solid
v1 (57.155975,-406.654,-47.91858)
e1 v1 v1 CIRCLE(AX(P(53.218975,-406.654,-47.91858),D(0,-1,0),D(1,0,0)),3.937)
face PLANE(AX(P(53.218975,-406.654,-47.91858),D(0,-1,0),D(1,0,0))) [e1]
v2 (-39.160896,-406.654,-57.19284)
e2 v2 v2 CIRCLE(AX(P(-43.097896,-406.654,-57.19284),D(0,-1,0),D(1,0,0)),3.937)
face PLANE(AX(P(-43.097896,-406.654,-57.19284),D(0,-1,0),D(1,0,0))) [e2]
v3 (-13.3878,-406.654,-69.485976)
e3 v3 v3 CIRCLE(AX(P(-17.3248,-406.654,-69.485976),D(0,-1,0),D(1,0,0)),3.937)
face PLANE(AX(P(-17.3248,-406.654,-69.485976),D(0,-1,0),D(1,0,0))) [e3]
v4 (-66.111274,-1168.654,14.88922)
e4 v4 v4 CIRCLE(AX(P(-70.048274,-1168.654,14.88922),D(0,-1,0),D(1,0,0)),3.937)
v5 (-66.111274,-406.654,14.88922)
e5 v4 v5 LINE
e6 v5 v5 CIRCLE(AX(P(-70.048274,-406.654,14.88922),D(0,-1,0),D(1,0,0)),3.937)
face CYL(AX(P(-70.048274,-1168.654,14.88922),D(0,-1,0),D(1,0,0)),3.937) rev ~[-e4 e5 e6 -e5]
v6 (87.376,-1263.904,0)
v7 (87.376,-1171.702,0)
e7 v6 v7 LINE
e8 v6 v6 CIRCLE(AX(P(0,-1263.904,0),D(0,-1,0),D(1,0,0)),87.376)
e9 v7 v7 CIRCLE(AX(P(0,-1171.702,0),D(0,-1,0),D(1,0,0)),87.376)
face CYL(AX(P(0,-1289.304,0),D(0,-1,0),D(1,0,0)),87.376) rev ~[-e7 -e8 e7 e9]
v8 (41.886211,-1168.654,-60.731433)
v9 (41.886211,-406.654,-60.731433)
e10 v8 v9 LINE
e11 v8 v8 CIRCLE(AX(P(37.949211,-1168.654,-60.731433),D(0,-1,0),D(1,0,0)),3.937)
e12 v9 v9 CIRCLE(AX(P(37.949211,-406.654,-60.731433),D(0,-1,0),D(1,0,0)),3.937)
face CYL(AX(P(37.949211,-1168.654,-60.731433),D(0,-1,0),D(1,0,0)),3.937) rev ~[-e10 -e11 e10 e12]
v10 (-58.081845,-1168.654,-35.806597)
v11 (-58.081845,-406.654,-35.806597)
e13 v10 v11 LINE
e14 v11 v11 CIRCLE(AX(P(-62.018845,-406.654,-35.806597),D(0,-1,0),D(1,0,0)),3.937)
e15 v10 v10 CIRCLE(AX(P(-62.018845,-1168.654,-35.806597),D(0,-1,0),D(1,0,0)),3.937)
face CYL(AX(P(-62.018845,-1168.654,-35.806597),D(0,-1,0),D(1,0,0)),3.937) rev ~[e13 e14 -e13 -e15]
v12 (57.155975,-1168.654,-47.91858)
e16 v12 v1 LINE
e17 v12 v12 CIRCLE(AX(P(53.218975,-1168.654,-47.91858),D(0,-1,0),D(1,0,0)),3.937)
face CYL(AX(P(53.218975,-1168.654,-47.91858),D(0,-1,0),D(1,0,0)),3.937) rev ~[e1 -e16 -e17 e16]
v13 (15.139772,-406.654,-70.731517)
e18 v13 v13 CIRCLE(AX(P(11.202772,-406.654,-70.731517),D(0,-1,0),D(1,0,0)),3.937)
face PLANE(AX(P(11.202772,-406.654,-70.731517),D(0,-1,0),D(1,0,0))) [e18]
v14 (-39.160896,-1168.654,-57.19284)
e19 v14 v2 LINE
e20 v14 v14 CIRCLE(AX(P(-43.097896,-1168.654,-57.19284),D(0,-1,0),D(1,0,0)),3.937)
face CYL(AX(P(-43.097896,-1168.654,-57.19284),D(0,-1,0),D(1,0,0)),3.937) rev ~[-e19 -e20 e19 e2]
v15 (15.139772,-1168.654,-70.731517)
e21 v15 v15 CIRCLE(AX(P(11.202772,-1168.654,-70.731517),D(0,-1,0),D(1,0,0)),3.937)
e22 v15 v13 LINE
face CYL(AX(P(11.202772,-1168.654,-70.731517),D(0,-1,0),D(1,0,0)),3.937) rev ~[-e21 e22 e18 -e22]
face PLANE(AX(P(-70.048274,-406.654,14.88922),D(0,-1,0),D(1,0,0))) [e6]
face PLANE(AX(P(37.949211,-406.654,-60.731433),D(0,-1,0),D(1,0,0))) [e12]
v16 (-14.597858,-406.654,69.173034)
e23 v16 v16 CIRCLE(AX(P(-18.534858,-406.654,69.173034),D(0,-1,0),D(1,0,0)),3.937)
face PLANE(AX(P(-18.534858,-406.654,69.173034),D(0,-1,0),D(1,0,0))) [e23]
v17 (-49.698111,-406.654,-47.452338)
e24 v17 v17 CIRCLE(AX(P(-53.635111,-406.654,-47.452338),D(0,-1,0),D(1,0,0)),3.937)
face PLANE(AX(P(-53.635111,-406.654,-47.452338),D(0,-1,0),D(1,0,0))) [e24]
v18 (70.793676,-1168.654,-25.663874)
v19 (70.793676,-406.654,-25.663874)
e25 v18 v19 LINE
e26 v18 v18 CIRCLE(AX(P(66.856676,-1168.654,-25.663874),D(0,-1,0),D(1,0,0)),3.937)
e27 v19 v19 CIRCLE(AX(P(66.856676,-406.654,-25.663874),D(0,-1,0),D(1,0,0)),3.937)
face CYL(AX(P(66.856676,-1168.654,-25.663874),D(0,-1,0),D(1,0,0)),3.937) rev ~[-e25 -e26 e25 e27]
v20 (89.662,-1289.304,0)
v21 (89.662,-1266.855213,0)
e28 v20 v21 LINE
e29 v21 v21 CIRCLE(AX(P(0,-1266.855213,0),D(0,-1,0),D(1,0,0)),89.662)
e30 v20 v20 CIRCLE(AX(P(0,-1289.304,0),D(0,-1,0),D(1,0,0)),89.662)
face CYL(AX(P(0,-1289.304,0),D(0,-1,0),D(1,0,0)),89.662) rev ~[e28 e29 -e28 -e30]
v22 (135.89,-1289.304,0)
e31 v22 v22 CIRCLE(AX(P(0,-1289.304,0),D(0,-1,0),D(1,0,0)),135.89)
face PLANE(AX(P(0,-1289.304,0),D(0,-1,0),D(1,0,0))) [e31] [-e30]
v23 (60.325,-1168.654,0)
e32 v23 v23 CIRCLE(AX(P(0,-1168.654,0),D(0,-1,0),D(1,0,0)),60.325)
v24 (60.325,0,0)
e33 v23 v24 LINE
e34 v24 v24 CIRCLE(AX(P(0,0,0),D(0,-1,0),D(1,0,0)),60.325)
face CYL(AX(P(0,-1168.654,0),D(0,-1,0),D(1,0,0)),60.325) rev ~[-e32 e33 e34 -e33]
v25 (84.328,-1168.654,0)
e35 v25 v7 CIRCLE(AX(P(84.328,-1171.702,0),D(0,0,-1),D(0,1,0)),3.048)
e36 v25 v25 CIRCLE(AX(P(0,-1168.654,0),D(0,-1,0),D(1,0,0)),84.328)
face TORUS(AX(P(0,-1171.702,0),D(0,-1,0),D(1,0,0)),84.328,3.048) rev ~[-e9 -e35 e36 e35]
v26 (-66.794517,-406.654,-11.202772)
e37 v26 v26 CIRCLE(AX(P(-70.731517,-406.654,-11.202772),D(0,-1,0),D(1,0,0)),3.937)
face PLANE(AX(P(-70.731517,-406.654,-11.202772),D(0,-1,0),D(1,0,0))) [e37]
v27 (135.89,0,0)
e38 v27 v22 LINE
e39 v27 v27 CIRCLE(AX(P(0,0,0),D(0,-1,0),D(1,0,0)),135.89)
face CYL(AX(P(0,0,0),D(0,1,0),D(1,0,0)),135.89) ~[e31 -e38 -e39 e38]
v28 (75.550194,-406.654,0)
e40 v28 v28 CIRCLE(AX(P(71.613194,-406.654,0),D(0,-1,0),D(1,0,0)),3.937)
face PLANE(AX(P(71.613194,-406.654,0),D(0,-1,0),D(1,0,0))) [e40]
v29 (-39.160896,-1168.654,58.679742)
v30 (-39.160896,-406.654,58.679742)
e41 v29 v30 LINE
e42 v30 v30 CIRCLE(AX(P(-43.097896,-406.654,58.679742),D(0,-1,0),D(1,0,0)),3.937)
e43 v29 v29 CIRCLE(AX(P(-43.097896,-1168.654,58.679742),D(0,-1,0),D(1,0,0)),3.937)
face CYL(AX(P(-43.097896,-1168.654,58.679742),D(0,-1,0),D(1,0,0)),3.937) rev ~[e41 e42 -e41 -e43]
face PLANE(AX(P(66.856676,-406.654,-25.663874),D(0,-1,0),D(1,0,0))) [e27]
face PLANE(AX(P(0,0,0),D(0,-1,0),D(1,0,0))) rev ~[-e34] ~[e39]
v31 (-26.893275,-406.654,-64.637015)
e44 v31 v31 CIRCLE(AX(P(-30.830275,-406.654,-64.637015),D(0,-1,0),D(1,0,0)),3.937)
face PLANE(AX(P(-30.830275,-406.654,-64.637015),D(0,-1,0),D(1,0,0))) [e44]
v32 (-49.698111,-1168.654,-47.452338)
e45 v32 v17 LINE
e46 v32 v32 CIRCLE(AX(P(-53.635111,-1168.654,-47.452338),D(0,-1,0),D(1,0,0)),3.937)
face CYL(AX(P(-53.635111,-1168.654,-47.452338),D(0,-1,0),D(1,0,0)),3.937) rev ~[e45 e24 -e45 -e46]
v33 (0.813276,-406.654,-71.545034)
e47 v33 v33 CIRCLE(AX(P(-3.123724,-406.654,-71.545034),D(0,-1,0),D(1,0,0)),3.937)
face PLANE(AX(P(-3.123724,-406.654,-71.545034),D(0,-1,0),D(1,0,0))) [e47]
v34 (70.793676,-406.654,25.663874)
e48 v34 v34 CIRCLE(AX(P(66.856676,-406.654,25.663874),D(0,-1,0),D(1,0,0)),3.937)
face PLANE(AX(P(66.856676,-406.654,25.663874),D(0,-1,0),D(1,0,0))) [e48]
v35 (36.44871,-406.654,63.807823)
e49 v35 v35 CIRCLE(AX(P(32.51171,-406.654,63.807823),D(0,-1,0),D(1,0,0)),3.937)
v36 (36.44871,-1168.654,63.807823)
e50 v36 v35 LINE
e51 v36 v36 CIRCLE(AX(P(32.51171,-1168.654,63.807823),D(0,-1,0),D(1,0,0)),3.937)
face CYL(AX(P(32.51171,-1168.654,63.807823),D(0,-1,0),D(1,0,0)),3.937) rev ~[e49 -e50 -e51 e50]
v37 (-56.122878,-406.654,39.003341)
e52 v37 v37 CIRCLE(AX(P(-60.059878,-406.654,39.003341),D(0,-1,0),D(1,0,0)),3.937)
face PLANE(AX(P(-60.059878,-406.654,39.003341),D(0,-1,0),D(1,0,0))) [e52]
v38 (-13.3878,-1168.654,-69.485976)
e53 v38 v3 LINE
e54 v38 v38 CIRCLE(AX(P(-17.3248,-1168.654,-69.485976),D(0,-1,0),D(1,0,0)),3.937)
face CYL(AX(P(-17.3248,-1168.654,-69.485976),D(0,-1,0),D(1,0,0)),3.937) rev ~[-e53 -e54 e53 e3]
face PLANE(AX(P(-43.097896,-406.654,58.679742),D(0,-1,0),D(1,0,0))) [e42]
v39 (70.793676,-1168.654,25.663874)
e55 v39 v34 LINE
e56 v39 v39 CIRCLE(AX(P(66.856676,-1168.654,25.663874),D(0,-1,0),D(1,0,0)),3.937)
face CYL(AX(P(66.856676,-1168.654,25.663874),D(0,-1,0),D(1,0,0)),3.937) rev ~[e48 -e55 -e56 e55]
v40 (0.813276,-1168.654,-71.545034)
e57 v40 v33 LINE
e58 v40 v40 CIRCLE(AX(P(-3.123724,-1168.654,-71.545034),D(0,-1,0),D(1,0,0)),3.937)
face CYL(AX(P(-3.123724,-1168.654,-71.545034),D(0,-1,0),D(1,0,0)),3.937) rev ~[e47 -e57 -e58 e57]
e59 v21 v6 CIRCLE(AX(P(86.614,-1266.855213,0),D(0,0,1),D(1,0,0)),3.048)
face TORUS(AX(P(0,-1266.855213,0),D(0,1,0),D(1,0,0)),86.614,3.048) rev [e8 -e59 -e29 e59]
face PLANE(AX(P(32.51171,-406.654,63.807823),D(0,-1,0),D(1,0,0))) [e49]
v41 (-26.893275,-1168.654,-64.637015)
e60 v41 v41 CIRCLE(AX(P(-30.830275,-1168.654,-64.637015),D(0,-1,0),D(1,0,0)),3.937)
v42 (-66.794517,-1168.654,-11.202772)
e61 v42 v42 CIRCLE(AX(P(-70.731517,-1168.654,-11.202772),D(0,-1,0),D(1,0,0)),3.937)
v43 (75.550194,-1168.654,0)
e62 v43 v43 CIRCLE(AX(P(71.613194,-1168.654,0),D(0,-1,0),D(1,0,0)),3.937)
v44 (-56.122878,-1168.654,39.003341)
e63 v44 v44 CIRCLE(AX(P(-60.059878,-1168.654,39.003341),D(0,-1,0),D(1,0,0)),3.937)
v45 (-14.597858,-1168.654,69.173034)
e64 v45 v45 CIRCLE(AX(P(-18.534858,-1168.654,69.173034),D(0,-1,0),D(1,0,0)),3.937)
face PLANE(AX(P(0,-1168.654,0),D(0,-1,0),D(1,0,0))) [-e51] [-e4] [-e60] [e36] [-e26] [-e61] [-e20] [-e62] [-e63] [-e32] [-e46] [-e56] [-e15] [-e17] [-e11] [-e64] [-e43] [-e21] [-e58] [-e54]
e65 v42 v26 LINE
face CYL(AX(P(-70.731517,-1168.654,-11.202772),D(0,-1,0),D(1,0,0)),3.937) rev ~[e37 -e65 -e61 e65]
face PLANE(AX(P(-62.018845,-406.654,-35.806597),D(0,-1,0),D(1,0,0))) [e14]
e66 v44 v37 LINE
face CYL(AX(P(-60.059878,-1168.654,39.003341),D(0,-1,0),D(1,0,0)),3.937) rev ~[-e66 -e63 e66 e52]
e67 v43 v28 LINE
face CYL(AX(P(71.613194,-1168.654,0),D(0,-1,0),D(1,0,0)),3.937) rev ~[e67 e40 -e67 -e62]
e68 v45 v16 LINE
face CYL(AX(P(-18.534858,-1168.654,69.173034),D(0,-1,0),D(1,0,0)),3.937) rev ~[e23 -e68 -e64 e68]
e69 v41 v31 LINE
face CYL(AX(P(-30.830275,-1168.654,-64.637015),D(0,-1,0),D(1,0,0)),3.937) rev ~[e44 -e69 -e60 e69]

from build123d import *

# Parameters (mm, degrees)
F0_R      = 135.89
F1_DEPTH  = 1289.304
F2_R      = 87.376
F3_DEPTH  = 120.65
F4_R      = 89.662
F5_DEPTH  = 25.4
F6_R      = 60.325
F7_DEPTH  = 1397
F9_R      = 3.937
F10_DEPTH = 762
F11_DEPTH = 762


# Not quite as in the source:
# - a fillet or chamfer that OpenCascade refuses, or shapes differently, is made with other operations: its cross-section is extruded or revolved along the edge and cut away or added


with BuildPart() as f1:
    # F0 (on Front) → F1 (new body)
    with BuildSketch(Plane.XZ):
        Circle(F0_R)
    extrude(amount=F1_DEPTH)

    # F2 (on face) → F3 (cut)
    with BuildSketch(Plane.XZ.offset(1289.304)):
        Circle(F2_R)
    extrude(amount=-F3_DEPTH, mode=Mode.SUBTRACT)

    # F4 (on face) → F5 (cut)
    with BuildSketch(Plane.XZ.offset(1289.304)):
        Circle(F4_R)
    extrude(amount=-F5_DEPTH, mode=Mode.SUBTRACT)

    # F6 (on face) → F7 (cut)
    with BuildSketch(Plane.XZ.offset(1168.654)):
        Circle(F6_R)
    extrude(amount=-F7_DEPTH, mode=Mode.SUBTRACT)

    # F8: fillet of radius 3.048 on 2 edges, made by hand

    # F8_s1 → F8_t2 (revolve)
    with BuildSketch(Plane.XY):
        with BuildLine():
            ThreePointArc((84.328, -1168.654), (86.4832614691, -1169.5467385309), (87.376, -1171.702))
            Line((87.376, -1171.702), (87.376, -1168.654))
            Line((87.376, -1168.654), (84.328, -1168.654))
        make_face()
    revolve(axis=Axis((0, -1168.654, 0), (0, -1, 0)))

    # F8_s3 → F8_t4 (revolve)
    with BuildSketch(Plane.XY):
        with BuildLine():
            ThreePointArc((89.662, -1266.8552133098), (89.023655577, -1264.9887021258), (87.376, -1263.904))
            Line((87.376, -1263.904), (89.662, -1263.904))
            Line((89.662, -1263.904), (89.662, -1266.8552133098))
        make_face()
    revolve(axis=Axis((0, -1263.904, 0), (0, -1, 0)))

    # F9 (on face) → F10 (cut)
    with BuildSketch(Plane.XZ.offset(1168.654)):
        with Locations((-60.0598781159, 39.003340895)):
            Circle(F9_R)
        with Locations((-43.0978960277, 58.6797422495)):
            Circle(F9_R)
        with Locations((-18.5348584976, 69.173033624)):
            Circle(F9_R)
        with Locations((-70.0482739288, 14.8892202572)):
            Circle(F9_R)
        with Locations((-70.7315167837, -11.2027716991)):
            Circle(F9_R)
        with Locations((-62.0188452827, -35.8065970188)):
            Circle(F9_R)
        with Locations((-53.6351113584, -47.4523380861)):
            Circle(F9_R)
        with Locations((-43.0978960277, -57.1928397463)):
            Circle(F9_R)
        with Locations((-30.8302747111, -64.6370151036)):
            Circle(F9_R)
        with Locations((-17.3247996515, -69.4859761197)):
            Circle(F9_R)
        with Locations((-3.1237236512, -71.5450341451)):
            Circle(F9_R)
        with Locations((11.2027716991, -70.7315167837)):
            Circle(F9_R)
        with Locations((37.9492110938, -60.7314328633)):
            Circle(F9_R)
        with Locations((53.218974585, -47.9185799497)):
            Circle(F9_R)
        with Locations((66.8566762325, -25.6638735077)):
            Circle(F9_R)
        with Locations((71.6131940376, 0)):
            Circle(F9_R)
        with Locations((66.8566762325, 25.6638735077)):
            Circle(F9_R)
        with Locations((32.5117097491, 63.8078231055)):
            Circle(F9_R)
    extrude(amount=-F10_DEPTH, mode=Mode.SUBTRACT)

    # F9 (on face) → F11 (cut)
    with BuildSketch(Plane.XZ.offset(1168.654)):
        with Locations((-60.0598781159, 39.003340895)):
            Circle(F9_R)
        with Locations((-43.0978960277, 58.6797422495)):
            Circle(F9_R)
        with Locations((-18.5348584976, 69.173033624)):
            Circle(F9_R)
        with Locations((-70.0482739288, 14.8892202572)):
            Circle(F9_R)
        with Locations((-70.7315167837, -11.2027716991)):
            Circle(F9_R)
        with Locations((-62.0188452827, -35.8065970188)):
            Circle(F9_R)
        with Locations((-53.6351113584, -47.4523380861)):
            Circle(F9_R)
        with Locations((-43.0978960277, -57.1928397463)):
            Circle(F9_R)
        with Locations((-30.8302747111, -64.6370151036)):
            Circle(F9_R)
        with Locations((-17.3247996515, -69.4859761197)):
            Circle(F9_R)
        with Locations((-3.1237236512, -71.5450341451)):
            Circle(F9_R)
        with Locations((11.2027716991, -70.7315167837)):
            Circle(F9_R)
        with Locations((37.9492110938, -60.7314328633)):
            Circle(F9_R)
        with Locations((53.218974585, -47.9185799497)):
            Circle(F9_R)
        with Locations((66.8566762325, -25.6638735077)):
            Circle(F9_R)
        with Locations((71.6131940376, 0)):
            Circle(F9_R)
        with Locations((66.8566762325, 25.6638735077)):
            Circle(F9_R)
        with Locations((32.5117097491, 63.8078231055)):
            Circle(F9_R)
    extrude(amount=-F11_DEPTH, mode=Mode.SUBTRACT)


solid = f1.part
